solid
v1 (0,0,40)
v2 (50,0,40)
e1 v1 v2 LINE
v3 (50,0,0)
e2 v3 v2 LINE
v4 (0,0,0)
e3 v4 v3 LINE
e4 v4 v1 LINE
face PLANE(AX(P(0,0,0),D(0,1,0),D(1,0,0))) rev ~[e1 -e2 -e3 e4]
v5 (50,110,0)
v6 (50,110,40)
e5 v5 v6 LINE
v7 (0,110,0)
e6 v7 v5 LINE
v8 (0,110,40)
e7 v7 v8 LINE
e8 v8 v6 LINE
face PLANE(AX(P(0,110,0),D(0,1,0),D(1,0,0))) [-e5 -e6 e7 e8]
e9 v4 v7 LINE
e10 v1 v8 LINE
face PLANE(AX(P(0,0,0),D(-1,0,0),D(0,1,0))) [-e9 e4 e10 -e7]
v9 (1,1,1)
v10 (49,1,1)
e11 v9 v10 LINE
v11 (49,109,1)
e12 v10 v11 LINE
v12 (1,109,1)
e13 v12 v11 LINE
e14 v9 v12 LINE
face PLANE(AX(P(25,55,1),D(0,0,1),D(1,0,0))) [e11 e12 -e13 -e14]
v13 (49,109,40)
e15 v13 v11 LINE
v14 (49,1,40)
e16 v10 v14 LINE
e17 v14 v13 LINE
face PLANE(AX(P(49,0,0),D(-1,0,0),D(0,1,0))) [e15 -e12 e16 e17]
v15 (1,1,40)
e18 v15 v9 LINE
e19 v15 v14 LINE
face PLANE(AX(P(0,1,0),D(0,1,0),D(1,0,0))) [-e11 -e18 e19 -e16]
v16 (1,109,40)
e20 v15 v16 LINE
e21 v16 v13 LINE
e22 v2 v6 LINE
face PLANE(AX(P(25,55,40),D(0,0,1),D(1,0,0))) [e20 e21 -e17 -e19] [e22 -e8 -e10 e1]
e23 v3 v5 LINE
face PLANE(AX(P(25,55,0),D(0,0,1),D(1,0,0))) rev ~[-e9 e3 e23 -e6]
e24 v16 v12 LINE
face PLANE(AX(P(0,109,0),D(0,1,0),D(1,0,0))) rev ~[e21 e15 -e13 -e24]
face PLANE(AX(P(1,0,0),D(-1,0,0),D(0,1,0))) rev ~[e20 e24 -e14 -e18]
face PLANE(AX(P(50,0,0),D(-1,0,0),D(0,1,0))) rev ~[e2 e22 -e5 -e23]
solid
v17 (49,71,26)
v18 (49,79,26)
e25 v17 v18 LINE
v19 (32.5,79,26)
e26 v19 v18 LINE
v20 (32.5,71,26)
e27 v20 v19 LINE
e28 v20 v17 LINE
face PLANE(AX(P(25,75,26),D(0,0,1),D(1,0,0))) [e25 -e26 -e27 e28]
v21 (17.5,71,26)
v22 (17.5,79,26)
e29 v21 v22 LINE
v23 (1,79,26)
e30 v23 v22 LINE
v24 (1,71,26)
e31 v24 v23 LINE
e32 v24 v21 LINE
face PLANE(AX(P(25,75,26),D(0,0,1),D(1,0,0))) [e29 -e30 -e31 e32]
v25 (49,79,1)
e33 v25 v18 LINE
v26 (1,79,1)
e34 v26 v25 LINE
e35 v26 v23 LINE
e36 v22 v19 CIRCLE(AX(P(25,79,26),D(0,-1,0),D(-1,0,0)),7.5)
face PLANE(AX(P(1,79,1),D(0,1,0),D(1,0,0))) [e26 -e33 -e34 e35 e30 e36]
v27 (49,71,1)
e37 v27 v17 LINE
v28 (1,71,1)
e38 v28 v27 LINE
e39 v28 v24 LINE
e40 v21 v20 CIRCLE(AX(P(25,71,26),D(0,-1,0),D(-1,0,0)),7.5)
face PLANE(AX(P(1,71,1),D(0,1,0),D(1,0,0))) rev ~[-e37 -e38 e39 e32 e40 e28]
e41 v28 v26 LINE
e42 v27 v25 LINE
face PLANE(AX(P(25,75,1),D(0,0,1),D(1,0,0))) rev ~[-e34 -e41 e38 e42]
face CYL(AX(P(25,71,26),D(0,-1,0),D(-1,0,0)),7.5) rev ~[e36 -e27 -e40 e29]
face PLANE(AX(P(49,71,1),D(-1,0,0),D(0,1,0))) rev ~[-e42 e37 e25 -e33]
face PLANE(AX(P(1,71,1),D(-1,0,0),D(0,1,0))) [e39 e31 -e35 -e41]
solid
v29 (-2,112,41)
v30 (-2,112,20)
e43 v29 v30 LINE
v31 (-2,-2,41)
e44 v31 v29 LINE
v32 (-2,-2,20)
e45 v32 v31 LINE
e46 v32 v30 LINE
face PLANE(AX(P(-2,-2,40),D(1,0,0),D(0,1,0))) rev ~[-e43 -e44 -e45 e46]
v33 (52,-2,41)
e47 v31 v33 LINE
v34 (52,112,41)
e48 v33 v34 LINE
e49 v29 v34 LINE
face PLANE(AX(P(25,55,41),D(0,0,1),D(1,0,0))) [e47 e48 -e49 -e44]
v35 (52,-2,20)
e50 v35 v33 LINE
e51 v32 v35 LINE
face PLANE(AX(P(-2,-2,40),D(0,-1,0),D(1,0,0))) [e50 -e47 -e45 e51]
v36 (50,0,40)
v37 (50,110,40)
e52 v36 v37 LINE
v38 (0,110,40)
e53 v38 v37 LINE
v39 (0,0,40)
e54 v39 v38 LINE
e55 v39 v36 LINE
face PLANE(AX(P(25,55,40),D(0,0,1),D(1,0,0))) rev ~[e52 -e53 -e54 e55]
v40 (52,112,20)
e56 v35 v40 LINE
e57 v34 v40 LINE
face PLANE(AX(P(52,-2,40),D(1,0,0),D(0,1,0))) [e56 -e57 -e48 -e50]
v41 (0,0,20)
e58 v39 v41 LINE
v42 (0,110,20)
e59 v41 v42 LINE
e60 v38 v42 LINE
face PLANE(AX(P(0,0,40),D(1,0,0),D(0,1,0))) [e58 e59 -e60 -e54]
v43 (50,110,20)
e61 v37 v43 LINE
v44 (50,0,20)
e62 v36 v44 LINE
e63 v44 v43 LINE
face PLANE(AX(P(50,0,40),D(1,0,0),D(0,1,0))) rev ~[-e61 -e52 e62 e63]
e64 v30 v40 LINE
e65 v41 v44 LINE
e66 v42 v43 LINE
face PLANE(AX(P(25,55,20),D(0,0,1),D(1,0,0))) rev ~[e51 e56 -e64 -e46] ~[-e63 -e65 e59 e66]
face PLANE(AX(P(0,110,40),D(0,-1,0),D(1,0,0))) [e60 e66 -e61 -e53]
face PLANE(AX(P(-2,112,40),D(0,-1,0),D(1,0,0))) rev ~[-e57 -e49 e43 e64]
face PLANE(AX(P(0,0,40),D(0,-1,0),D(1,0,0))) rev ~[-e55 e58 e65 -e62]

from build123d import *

# Parameters (mm, degrees)
F0_W     = 50
F0_H     = 110
F1_DEPTH = 40
F2_T     = -1
F3_W     = 54
F3_H     = 114
F3_W_2   = 50
F3_H_2   = 110
F3_W_3   = 48
F3_H_3   = 108
F4_DEPTH = 1
F5_DEPTH = 20
F6_W     = 48
F6_H     = 8
F7_DEPTH = 25
F9_DEPTH = 41.001


with BuildPart() as f1:
    # F0 (on Top) → F1 (new body)
    with BuildSketch(Plane.XY):
        with Locations((25, 55)):
            Rectangle(F0_W, F0_H)
    extrude(amount=F1_DEPTH)

    # F2
    f2_openings = [f1.faces().sort_by_distance(p)[0] for p in [
        (25, 55, 40),
    ]]
    offset(amount=F2_T, openings=f2_openings)


with BuildPart() as f4:
    # F3 (on face) → F4 (new body)
    with BuildSketch(Plane.XY.offset(40)):
        with Locations((25, 55)):
            Rectangle(F3_W, F3_H)
        with Locations((25, 55)):
            Rectangle(F3_W_2, F3_H_2, mode=Mode.SUBTRACT)
        with Locations((25, 55)):
            Rectangle(F3_W_2, F3_H_2)
        with Locations((25, 55)):
            Rectangle(F3_W_3, F3_H_3, mode=Mode.SUBTRACT)
        with Locations((25, 55)):
            Rectangle(F3_W_3, F3_H_3)
    extrude(amount=F4_DEPTH)

    # F3 (on face) → F5 (join)
    with BuildSketch(Plane.XY.offset(40)):
        with Locations((25, 55)):
            Rectangle(F3_W, F3_H)
        with Locations((25, 55)):
            Rectangle(F3_W_2, F3_H_2, mode=Mode.SUBTRACT)
    extrude(amount=-F5_DEPTH)


with BuildPart() as f7:
    # F6 (on face) → F7 (new body)
    with BuildSketch(Plane.XY.offset(1)):
        with Locations((25, 75)):
            Rectangle(F6_W, F6_H)
    extrude(amount=F7_DEPTH)

    # F8 (on face) → F9 (cut, through all)
    with BuildSketch(Plane.XZ.offset(-71)):
        with BuildLine():
            ThreePointArc((17.5, 26), (25, 18.5), (32.5, 26))
            Line((32.5, 26), (17.5, 26))
        make_face()
    extrude(amount=-F9_DEPTH, mode=Mode.SUBTRACT)


solid = Compound([f1.part, f4.part, f7.part])
